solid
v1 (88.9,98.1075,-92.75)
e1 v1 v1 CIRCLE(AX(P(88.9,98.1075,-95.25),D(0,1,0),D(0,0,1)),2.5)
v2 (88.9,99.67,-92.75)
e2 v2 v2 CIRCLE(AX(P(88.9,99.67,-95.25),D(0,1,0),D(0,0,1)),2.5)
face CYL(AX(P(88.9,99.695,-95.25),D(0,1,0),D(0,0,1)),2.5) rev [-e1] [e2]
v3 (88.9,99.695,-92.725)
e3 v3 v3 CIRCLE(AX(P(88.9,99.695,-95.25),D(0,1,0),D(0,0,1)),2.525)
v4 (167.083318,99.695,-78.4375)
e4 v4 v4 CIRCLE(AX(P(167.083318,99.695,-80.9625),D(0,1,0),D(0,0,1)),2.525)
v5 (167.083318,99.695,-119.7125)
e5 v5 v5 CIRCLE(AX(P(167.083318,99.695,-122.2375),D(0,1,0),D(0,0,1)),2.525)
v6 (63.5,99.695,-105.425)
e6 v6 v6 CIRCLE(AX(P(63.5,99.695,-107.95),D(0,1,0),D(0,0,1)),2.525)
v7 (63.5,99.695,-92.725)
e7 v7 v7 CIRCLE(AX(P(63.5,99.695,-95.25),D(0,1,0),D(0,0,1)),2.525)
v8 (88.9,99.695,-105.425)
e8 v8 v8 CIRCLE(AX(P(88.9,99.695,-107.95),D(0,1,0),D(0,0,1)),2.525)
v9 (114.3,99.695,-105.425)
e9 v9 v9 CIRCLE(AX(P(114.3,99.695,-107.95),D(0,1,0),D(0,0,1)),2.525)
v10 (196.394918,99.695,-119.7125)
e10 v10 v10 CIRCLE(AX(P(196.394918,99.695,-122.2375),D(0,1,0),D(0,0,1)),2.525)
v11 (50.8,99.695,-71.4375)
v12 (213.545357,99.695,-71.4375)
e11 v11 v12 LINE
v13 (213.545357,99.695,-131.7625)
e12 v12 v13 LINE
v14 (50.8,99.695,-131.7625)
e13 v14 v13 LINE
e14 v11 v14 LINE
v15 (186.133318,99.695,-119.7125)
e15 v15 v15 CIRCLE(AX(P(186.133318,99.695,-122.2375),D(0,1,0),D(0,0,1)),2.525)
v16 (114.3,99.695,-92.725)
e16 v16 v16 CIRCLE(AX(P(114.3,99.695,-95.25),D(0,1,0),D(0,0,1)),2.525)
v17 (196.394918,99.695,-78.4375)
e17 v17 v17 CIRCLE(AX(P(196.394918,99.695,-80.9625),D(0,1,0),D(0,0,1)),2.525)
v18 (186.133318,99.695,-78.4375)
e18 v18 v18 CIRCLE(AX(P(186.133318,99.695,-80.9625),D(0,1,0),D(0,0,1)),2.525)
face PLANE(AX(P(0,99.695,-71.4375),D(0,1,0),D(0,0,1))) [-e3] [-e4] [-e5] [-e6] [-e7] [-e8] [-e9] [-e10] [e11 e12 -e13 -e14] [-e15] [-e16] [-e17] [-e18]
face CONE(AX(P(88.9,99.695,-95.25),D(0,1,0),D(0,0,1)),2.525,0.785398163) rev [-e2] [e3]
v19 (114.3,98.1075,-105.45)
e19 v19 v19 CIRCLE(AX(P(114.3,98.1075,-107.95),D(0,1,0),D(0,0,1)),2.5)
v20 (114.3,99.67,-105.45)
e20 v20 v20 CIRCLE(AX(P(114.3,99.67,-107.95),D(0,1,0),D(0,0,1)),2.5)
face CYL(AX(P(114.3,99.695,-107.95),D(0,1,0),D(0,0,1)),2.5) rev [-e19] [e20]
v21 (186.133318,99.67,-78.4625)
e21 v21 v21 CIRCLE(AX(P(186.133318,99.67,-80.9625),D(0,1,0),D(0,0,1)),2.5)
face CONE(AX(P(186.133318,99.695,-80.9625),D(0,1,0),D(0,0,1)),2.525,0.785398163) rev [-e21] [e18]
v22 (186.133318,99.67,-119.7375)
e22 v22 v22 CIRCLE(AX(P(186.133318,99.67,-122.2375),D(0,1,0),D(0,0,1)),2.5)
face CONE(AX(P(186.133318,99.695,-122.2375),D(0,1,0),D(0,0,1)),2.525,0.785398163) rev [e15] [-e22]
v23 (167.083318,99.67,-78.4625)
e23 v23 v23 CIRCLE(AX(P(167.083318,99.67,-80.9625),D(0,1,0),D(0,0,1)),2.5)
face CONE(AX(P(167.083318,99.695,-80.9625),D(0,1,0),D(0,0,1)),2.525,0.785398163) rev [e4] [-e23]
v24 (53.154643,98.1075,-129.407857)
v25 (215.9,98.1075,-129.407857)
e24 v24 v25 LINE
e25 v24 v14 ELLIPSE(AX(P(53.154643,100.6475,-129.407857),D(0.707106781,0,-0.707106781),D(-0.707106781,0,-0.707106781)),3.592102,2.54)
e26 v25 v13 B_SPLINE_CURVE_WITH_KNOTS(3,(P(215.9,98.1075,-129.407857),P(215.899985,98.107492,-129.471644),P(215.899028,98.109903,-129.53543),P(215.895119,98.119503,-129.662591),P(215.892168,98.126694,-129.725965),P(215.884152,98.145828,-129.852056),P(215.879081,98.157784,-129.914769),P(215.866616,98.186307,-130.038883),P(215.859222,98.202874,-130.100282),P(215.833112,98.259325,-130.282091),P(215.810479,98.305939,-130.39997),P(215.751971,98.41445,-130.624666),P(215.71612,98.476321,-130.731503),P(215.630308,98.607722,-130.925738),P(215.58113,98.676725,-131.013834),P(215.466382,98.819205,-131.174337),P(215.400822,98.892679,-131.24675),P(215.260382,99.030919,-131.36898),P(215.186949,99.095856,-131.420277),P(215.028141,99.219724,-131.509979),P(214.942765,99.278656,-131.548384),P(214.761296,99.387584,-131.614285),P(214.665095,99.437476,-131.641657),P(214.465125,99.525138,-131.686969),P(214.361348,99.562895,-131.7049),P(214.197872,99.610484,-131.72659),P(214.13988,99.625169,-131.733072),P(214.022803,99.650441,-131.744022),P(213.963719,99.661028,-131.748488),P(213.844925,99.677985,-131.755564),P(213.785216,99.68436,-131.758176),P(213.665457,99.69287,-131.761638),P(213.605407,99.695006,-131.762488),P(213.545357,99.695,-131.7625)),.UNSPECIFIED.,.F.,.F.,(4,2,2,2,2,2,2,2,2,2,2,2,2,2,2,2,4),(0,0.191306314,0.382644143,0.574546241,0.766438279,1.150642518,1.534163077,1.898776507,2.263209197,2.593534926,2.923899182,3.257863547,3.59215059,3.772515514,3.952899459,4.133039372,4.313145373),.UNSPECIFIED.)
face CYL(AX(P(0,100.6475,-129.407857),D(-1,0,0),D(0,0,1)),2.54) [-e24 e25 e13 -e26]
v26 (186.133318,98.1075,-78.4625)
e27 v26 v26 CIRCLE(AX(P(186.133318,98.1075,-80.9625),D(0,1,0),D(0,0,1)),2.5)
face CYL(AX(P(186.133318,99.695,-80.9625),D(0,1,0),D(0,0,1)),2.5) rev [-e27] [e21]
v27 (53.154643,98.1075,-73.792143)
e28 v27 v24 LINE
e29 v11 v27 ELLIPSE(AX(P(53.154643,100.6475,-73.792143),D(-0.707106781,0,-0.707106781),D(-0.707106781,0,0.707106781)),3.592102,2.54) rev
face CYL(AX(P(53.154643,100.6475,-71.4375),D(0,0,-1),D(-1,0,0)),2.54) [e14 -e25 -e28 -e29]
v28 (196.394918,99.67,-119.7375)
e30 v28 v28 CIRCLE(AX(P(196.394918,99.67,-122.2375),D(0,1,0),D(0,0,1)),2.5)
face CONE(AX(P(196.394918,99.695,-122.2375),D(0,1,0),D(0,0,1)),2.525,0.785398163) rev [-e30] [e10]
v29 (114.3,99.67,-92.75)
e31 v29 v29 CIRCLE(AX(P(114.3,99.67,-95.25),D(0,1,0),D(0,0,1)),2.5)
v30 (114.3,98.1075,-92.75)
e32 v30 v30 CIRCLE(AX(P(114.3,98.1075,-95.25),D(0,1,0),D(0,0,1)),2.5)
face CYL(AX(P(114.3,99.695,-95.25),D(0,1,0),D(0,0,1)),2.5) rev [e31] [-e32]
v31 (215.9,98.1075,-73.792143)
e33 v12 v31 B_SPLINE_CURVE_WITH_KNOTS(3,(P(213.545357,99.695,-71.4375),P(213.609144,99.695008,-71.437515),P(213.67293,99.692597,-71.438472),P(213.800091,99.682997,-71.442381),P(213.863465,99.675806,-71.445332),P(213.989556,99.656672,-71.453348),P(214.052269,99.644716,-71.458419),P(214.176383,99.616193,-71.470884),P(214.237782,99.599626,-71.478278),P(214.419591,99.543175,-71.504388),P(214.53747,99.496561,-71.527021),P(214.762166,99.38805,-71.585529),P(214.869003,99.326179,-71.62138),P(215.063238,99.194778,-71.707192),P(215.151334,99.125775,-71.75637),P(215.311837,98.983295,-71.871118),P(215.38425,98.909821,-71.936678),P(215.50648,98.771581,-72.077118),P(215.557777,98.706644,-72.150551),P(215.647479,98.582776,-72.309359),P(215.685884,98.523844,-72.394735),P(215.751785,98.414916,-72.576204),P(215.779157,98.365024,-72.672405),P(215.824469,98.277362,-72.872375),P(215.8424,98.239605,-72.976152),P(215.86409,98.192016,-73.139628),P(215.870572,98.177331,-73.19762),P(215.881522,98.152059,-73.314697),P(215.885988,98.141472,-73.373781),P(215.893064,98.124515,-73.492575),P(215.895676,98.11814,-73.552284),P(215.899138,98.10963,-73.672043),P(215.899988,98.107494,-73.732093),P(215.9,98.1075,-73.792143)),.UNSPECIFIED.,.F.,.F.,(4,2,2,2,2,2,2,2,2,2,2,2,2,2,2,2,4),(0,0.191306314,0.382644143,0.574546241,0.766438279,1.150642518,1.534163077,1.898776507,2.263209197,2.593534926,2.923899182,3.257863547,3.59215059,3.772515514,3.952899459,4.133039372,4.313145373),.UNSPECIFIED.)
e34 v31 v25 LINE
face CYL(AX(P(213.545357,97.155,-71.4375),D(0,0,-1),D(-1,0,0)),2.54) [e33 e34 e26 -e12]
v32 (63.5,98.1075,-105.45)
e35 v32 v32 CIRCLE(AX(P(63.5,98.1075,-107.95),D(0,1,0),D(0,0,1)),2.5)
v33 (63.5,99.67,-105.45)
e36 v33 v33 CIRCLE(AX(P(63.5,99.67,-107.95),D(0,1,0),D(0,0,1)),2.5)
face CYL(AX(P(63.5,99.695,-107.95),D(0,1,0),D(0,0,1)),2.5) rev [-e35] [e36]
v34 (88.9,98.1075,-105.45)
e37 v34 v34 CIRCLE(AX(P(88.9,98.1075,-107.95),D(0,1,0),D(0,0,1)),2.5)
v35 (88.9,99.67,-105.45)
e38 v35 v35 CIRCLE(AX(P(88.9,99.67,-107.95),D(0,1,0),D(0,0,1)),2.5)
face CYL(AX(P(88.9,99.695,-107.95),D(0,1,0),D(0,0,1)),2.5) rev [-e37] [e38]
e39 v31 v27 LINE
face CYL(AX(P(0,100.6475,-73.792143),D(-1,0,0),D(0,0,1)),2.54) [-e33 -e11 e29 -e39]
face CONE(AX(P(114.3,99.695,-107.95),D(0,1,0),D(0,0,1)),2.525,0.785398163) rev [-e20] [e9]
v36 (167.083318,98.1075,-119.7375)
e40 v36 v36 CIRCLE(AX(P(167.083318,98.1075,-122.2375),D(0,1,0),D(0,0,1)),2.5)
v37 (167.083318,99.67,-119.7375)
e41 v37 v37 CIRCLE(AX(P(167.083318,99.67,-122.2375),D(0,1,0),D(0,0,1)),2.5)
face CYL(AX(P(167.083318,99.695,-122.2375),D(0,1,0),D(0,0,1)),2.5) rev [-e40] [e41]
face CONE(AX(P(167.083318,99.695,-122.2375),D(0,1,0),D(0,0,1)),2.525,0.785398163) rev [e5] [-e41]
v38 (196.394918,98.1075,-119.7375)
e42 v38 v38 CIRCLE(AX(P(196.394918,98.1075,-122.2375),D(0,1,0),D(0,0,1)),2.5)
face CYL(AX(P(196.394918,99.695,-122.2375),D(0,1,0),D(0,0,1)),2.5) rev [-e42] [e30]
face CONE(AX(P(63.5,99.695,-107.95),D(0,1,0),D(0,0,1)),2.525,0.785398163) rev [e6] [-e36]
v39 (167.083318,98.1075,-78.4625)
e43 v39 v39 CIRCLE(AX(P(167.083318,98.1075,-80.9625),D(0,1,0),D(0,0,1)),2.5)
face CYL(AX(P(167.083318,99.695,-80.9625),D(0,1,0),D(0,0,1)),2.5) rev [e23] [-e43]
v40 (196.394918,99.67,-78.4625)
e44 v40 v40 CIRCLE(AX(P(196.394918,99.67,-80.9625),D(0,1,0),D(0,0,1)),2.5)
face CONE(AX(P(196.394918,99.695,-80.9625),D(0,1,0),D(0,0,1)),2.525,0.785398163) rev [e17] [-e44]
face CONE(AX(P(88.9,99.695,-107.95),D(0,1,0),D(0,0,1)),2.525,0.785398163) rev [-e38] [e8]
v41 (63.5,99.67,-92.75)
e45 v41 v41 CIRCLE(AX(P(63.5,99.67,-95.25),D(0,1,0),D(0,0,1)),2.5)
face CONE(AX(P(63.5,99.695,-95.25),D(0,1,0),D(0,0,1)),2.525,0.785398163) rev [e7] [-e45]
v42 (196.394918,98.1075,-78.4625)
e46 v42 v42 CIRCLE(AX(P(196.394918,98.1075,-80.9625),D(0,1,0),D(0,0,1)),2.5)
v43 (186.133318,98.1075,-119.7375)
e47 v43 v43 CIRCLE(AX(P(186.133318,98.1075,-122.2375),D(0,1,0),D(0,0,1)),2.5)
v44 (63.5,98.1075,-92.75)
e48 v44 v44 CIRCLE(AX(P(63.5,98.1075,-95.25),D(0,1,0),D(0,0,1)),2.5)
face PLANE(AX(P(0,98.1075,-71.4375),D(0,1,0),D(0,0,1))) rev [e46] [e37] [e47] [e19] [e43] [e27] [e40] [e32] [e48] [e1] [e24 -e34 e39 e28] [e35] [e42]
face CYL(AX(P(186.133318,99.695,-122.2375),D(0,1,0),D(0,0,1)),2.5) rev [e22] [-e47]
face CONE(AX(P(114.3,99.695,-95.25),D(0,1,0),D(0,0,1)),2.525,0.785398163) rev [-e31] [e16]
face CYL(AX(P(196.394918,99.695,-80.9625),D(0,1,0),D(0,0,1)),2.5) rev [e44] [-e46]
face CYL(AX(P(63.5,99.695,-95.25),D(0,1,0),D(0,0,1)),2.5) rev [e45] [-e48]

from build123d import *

# Parameters (mm, degrees)
BOSS_EXTRUDE1_START            = -131.7625
BOSS_EXTRUDE1_DEPTH            = 60.325
F_5_0MM_DOWEL_HOLE1_AT_2_COUNT = 2
F_5_0MM_DOWEL_HOLE1_AT_2_PITCH = 12.7
F_5_0MM_DOWEL_HOLE1_AT_3_COUNT = 2
F_5_0MM_DOWEL_HOLE1_AT_3_PITCH = 28.398063314
F_5_0MM_DOWEL_HOLE1_AT_4_COUNT = 2
F_5_0MM_DOWEL_HOLE1_AT_4_PITCH = 25.4
F_5_0MM_DOWEL_HOLE1_AT_5_COUNT = 2
F_5_0MM_DOWEL_HOLE1_AT_5_PITCH = 50.8
F_5_0MM_DOWEL_HOLE1_AT_6_COUNT = 2
F_5_0MM_DOWEL_HOLE1_AT_6_PITCH = 52.363441445
FILLET2_R                      = 2.54
FILLET3_R                      = 2.54
FILLET4_R                      = 2.54
F_5_0MM_DOWEL_HOLE2_AT_2_COUNT = 2
F_5_0MM_DOWEL_HOLE2_AT_2_PITCH = 41.275
F_5_0MM_DOWEL_HOLE2_AT_3_COUNT = 2
F_5_0MM_DOWEL_HOLE2_AT_3_PITCH = 45.459081876
F_5_0MM_DOWEL_HOLE2_AT_4_COUNT = 2
F_5_0MM_DOWEL_HOLE2_AT_4_PITCH = 50.624060678
F_5_0MM_DOWEL_HOLE2_AT_5_COUNT = 2
F_5_0MM_DOWEL_HOLE2_AT_5_PITCH = 29.3116
F_5_0MM_DOWEL_HOLE2_AT_6_COUNT = 2
F_5_0MM_DOWEL_HOLE2_AT_6_PITCH = 19.05


with BuildPart() as part:
    # Sketch5 → Boss-Extrude1 (new body)
    with BuildSketch(Plane.XY.offset(BOSS_EXTRUDE1_START)):
        Polygon((50.8, 99.695), (50.8, 98.1075), (138.43, 98.1075), (215.9, 98.1075), (215.9, 99.695), align=None)
    extrude(amount=BOSS_EXTRUDE1_DEPTH)

    # Sketch7 → Ø5.0mm Dowel Hole1 (revolve, cut)
    with BuildSketch(Plane(origin=(114.3, 99.695, -107.95), x_dir=(0, 0, 1), z_dir=(1, 0, 0))):
        Polygon((0, 0), (0, 1.5875), (2.5, 1.5875), (2.5, 0.025), (2.525, 0), align=None)
    f_5_0mm_dowel_hole1 = revolve(axis=Axis((114.3, 106.045, -107.95), (0, -1, 0)), mode=Mode.SUBTRACT)

    # Ø5.0mm Dowel Hole1 at 2: Ø5.0mm Dowel Hole1 ×2
    with Locations(*[(0, 0, i * F_5_0MM_DOWEL_HOLE1_AT_2_PITCH) for i in range(1, F_5_0MM_DOWEL_HOLE1_AT_2_COUNT)]):
        add(f_5_0mm_dowel_hole1, mode=Mode.SUBTRACT)

    # Ø5.0mm Dowel Hole1 at 3: Ø5.0mm Dowel Hole1 ×2
    with Locations(*[Vector(-0.894427190999915, 0, 0.44721359549996) * (i * F_5_0MM_DOWEL_HOLE1_AT_3_PITCH) for i in range(1, F_5_0MM_DOWEL_HOLE1_AT_3_COUNT)]):
        add(f_5_0mm_dowel_hole1, mode=Mode.SUBTRACT)

    # Ø5.0mm Dowel Hole1 at 4: Ø5.0mm Dowel Hole1 ×2
    with Locations(*[(-i * F_5_0MM_DOWEL_HOLE1_AT_4_PITCH, 0, 0) for i in range(1, F_5_0MM_DOWEL_HOLE1_AT_4_COUNT)]):
        add(f_5_0mm_dowel_hole1, mode=Mode.SUBTRACT)

    # Ø5.0mm Dowel Hole1 at 5: Ø5.0mm Dowel Hole1 ×2
    with Locations(*[(-i * F_5_0MM_DOWEL_HOLE1_AT_5_PITCH, 0, 0) for i in range(1, F_5_0MM_DOWEL_HOLE1_AT_5_COUNT)]):
        add(f_5_0mm_dowel_hole1, mode=Mode.SUBTRACT)

    # Ø5.0mm Dowel Hole1 at 6: Ø5.0mm Dowel Hole1 ×2
    with Locations(*[Vector(-0.9701425001453318, 0, 0.2425356250363337) * (i * F_5_0MM_DOWEL_HOLE1_AT_6_PITCH) for i in range(1, F_5_0MM_DOWEL_HOLE1_AT_6_COUNT)]):
        add(f_5_0mm_dowel_hole1, mode=Mode.SUBTRACT)

    # Fillet2
    # the kernel refuses this fillet: 2.54 mm, written as the material it takes off along each edge
    with BuildSketch(Plane(origin=(215.9, 99.695, -137.649107549), x_dir=(-1, 0, 0), z_dir=(0, 0, 1))) as fillet2_piece_1:
        with BuildLine():
            CenterArc((2.35464302, 2.54), FILLET2_R, 202.024312837, 67.975687163)
            Line((0, 1.5875), (-0.04709286, 1.56845))
            ThreePointArc((-0.04709286, 1.56845), (-0.0508, 0.79375), (-0.0508, 0))
            Line((-0.0508, 0), (0, -0.0508))
            Line((0, -0.0508), (2.35464302, -0.0508))
            Line((2.35464302, -0.0508), (2.35464302, 0))
        make_face()
    extrude(amount=72.098215098, mode=Mode.SUBTRACT)

    # Fillet3
    # the kernel refuses this fillet: 2.54 mm, written as the material it takes off along each edge
    with BuildSketch(Plane(origin=(221.786607549, 98.1075, -71.4375), x_dir=(0, 0, -1), z_dir=(-1, 0, 0))) as fillet3_piece_1:
        with BuildLine():
            CenterArc((2.35464302, -2.54), FILLET3_R, 90, 67.975687163)
            Line((0, -1.5875), (-0.04709286, -1.56845))
            ThreePointArc((-0.04709286, -1.56845), (-0.0508, -0.79375), (-0.0508, 0))
            Line((-0.0508, 0), (0, 0.0508))
            Line((0, 0.0508), (2.35464302, 0.0508))
            Line((2.35464302, 0.0508), (2.35464302, 0))
        make_face()
    extrude(amount=176.873215098, mode=Mode.SUBTRACT)

    # Fillet4
    # the kernel refuses this fillet: 2.54 mm, written as the material it takes off along each edge
    with BuildSketch(Plane(origin=(44.913392451, 98.1075, -131.7625), x_dir=(0, 1, 0), z_dir=(1, 0, 0))) as fillet4_piece_1:
        with BuildLine():
            CenterArc((2.54, 2.35464302), FILLET4_R, 180, 67.975687163)
            Line((0, 2.35464302), (-0.0508, 2.35464302))
            Line((-0.0508, 2.35464302), (-0.0508, 0))
            Line((-0.0508, 0), (0, -0.0508))
            ThreePointArc((0, -0.0508), (0.79375, -0.0508), (1.56845, -0.04709286))
            Line((1.56845, -0.04709286), (1.5875, 0))
        make_face()
    extrude(amount=176.873215098, mode=Mode.SUBTRACT)
    with BuildSketch(Plane(origin=(50.8, 98.1075, -137.649107549), x_dir=(0, 1, 0), z_dir=(0, 0, 1))) as fillet4_piece_2:
        with BuildLine():
            CenterArc((2.54, -2.35464302), FILLET4_R, 112.024312837, 67.975687163)
            Line((0, -2.35464302), (-0.0508, -2.35464302))
            Line((-0.0508, -2.35464302), (-0.0508, 0))
            Line((-0.0508, 0), (0, 0.0508))
            ThreePointArc((0, 0.0508), (0.79375, 0.0508), (1.56845, 0.04709286))
            Line((1.56845, 0.04709286), (1.5875, 0))
        make_face()
    extrude(amount=69.743572079, mode=Mode.SUBTRACT)

    # Sketch9 → Ø5.0mm Dowel Hole2 (revolve, cut)
    with BuildSketch(Plane(origin=(167.083317581, 99.695, -122.2375), x_dir=(0, 0, 1), z_dir=(1, 0, 0))):
        Polygon((0, 0), (0, 1.5875), (2.5, 1.5875), (2.5, 0.025), (2.525, 0), align=None)
    f_5_0mm_dowel_hole2 = revolve(axis=Axis((167.083317581, 106.045, -122.2375), (0, -1, 0)), mode=Mode.SUBTRACT)

    # Ø5.0mm Dowel Hole2 at 2: Ø5.0mm Dowel Hole2 ×2
    with Locations(*[(0, 0, i * F_5_0MM_DOWEL_HOLE2_AT_2_PITCH) for i in range(1, F_5_0MM_DOWEL_HOLE2_AT_2_COUNT)]):
        add(f_5_0mm_dowel_hole2, mode=Mode.SUBTRACT)

    # Ø5.0mm Dowel Hole2 at 3: Ø5.0mm Dowel Hole2 ×2
    with Locations(*[Vector(0.41905817746174606, 0, 0.9079593845004521) * (i * F_5_0MM_DOWEL_HOLE2_AT_3_PITCH) for i in range(1, F_5_0MM_DOWEL_HOLE2_AT_3_COUNT)]):
        add(f_5_0mm_dowel_hole2, mode=Mode.SUBTRACT)

    # Ø5.0mm Dowel Hole2 at 4: Ø5.0mm Dowel Hole2 ×2
    with Locations(*[Vector(0.5790053110568745, 0, 0.8153237699024432) * (i * F_5_0MM_DOWEL_HOLE2_AT_4_PITCH) for i in range(1, F_5_0MM_DOWEL_HOLE2_AT_4_COUNT)]):
        add(f_5_0mm_dowel_hole2, mode=Mode.SUBTRACT)

    # Ø5.0mm Dowel Hole2 at 5: Ø5.0mm Dowel Hole2 ×2
    with Locations(*[(i * F_5_0MM_DOWEL_HOLE2_AT_5_PITCH, 0, 0) for i in range(1, F_5_0MM_DOWEL_HOLE2_AT_5_COUNT)]):
        add(f_5_0mm_dowel_hole2, mode=Mode.SUBTRACT)

    # Ø5.0mm Dowel Hole2 at 6: Ø5.0mm Dowel Hole2 ×2
    with Locations(*[(i * F_5_0MM_DOWEL_HOLE2_AT_6_PITCH, 0, 0) for i in range(1, F_5_0MM_DOWEL_HOLE2_AT_6_COUNT)]):
        add(f_5_0mm_dowel_hole2, mode=Mode.SUBTRACT)


solid = part.part
